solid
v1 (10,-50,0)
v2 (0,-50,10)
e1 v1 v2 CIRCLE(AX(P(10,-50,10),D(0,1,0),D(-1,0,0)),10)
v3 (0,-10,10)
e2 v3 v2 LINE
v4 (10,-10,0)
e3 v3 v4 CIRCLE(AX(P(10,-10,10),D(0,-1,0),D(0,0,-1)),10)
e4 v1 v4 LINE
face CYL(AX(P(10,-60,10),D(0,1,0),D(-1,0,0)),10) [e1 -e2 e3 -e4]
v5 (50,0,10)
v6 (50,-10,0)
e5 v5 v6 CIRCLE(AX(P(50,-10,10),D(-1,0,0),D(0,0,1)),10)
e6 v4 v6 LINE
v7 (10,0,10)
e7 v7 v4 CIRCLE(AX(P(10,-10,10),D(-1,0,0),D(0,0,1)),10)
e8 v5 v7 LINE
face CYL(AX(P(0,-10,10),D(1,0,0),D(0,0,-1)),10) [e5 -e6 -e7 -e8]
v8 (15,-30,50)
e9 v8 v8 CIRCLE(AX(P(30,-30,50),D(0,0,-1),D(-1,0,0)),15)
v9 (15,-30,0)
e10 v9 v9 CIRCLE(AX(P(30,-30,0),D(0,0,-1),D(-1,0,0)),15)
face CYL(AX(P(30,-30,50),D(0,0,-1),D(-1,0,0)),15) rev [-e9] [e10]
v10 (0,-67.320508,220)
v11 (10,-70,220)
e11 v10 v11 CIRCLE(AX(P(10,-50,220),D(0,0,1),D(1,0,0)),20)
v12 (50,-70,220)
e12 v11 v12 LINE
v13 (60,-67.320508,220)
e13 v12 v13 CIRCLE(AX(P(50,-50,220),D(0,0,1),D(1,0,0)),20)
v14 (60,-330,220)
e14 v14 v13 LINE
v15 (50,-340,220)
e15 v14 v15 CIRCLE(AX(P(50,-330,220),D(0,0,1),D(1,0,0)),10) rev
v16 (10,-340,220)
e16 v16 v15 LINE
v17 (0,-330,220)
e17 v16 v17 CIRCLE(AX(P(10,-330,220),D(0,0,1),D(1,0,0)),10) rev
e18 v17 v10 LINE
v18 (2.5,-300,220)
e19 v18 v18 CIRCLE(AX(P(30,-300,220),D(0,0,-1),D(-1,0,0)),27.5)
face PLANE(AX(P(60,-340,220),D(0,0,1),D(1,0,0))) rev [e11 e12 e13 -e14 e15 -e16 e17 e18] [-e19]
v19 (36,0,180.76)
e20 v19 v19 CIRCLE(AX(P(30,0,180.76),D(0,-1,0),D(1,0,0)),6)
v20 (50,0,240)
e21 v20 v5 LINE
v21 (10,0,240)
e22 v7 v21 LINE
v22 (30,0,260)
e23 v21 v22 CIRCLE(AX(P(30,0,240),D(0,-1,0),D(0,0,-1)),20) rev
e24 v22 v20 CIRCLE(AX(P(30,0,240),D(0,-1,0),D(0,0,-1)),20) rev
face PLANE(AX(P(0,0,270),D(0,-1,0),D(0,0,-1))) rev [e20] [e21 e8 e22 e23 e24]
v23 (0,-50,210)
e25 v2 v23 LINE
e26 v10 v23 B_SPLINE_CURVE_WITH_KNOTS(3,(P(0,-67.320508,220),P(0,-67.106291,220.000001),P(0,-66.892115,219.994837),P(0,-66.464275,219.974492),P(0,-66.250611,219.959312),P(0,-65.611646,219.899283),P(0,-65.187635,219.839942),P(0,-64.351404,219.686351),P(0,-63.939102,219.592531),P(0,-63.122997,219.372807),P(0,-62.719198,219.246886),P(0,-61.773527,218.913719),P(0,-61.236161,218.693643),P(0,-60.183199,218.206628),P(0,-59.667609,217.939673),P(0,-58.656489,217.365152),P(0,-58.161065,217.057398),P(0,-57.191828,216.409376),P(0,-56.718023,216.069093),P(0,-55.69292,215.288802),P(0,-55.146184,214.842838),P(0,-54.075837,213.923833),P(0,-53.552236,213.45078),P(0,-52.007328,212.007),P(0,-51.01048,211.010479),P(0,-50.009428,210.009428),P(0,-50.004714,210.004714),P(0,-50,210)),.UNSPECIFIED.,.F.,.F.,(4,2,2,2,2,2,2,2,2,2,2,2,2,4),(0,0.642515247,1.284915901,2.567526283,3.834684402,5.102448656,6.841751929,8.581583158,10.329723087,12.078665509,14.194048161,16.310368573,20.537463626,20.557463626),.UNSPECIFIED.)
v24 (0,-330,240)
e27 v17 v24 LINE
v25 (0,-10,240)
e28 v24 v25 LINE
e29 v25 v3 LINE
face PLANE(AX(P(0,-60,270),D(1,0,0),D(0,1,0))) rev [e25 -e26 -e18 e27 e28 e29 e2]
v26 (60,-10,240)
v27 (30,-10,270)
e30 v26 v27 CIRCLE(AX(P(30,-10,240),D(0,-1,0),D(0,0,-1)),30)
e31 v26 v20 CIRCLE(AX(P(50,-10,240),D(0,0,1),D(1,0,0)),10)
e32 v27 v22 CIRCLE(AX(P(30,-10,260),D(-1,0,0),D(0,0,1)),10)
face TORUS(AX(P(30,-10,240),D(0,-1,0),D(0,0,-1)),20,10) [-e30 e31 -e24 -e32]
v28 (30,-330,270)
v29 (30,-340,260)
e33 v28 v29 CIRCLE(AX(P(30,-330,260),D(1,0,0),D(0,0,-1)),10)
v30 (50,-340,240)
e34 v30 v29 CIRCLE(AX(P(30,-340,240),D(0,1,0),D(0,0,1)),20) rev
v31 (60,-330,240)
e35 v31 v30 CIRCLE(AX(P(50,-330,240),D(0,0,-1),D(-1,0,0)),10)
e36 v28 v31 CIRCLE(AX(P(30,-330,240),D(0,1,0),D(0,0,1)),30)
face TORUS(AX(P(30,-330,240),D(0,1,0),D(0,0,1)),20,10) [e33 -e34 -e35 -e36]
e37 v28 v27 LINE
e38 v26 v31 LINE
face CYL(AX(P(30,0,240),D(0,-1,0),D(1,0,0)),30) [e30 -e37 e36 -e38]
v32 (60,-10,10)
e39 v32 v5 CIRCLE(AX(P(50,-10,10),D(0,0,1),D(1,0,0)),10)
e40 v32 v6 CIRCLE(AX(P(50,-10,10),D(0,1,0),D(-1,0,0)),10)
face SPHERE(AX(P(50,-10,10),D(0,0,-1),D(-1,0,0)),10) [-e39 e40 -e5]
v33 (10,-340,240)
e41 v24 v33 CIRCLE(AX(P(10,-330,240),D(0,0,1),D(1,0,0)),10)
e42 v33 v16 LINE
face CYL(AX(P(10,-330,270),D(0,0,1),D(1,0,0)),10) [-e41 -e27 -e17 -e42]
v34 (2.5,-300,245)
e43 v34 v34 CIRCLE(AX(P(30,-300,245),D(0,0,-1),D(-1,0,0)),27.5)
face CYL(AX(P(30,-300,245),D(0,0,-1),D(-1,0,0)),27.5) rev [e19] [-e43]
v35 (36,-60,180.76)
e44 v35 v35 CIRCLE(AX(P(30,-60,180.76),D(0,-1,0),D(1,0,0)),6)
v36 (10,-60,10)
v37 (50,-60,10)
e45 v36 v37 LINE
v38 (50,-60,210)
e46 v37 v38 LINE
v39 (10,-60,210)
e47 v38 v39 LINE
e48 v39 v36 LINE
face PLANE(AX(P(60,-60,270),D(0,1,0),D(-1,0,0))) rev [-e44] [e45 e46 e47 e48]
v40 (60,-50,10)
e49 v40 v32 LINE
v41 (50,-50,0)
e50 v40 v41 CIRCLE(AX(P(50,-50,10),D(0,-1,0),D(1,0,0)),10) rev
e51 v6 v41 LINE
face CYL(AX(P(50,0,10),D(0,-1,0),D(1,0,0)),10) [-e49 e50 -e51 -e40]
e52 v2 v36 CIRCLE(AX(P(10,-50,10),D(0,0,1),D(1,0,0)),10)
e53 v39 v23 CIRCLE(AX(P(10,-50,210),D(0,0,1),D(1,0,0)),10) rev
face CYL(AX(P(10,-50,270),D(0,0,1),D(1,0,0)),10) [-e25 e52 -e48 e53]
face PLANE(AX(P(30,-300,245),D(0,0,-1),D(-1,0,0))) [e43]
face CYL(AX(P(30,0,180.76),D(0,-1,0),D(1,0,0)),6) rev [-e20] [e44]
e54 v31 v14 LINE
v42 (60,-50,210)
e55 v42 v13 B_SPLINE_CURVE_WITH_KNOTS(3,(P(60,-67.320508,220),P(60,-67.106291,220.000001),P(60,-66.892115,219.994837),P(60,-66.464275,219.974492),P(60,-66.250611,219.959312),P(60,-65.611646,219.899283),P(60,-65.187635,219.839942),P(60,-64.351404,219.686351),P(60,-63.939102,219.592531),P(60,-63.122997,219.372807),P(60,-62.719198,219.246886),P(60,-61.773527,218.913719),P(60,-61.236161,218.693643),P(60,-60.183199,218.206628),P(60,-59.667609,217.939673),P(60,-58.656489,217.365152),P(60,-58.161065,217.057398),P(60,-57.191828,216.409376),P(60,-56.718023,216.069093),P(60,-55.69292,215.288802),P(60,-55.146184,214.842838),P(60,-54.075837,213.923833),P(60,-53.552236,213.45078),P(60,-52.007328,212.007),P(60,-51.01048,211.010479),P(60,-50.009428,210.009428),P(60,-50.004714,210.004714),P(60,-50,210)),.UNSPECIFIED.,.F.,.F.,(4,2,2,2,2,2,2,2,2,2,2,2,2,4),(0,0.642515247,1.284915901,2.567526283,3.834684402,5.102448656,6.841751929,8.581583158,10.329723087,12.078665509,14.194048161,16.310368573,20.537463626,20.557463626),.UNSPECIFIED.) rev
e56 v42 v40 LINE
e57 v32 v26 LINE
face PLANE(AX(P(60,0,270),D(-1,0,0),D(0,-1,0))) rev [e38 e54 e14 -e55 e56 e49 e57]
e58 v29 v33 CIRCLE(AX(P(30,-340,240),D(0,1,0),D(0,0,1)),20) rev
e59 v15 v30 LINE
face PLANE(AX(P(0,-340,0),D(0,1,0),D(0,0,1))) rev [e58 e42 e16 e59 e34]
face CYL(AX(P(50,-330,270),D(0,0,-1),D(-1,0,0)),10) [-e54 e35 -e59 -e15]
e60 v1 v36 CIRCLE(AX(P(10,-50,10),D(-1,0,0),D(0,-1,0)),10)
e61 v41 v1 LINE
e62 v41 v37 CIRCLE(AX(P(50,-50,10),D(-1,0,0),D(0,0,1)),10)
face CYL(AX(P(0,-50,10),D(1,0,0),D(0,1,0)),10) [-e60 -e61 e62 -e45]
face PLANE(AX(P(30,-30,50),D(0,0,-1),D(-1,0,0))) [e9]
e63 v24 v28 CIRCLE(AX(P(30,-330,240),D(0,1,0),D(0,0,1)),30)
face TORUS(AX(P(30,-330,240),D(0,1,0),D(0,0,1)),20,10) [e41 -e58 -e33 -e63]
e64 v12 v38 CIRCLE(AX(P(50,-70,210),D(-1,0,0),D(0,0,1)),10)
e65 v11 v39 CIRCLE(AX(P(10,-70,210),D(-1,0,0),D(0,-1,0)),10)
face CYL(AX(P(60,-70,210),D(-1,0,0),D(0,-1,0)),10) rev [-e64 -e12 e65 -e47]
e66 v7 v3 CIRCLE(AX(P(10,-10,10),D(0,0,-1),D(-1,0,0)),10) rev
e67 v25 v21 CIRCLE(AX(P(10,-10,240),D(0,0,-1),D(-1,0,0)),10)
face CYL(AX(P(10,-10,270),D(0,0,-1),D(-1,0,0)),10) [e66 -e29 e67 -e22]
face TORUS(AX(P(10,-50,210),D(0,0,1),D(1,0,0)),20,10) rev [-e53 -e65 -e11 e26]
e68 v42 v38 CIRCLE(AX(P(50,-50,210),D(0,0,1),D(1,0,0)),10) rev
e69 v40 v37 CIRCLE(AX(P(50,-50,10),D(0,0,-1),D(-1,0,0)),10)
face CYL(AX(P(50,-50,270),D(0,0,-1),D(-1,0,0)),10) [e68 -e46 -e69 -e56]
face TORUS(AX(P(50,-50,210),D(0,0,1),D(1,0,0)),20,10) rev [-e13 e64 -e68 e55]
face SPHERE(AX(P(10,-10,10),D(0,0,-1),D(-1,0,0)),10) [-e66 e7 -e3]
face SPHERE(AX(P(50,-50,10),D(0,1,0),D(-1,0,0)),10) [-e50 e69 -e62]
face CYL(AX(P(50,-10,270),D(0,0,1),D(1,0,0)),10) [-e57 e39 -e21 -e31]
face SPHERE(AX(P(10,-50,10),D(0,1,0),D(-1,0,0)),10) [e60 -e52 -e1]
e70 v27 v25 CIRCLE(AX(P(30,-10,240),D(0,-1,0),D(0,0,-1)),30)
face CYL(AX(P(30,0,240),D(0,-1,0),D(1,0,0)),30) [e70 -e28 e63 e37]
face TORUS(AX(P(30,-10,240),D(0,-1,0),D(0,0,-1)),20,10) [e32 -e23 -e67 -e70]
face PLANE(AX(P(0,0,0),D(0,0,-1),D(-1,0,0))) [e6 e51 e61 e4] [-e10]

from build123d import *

# Parameters (mm, degrees)
SKETCH1_W           = 60
SKETCH1_H           = 60
BOSS_EXTRUDE1_DEPTH = 270
SKETCH2_W           = 60
SKETCH2_H           = 50
BOSS_EXTRUDE2_DEPTH = 280
SKETCH3_R           = 15
CUT_EXTRUDE1_DEPTH  = 50
SKETCH4_R           = 27.5
CUT_EXTRUDE2_DEPTH  = 25
FILLET1_R           = 30
FILLET2_R           = 30
FILLET3_R           = 10
FILLET4_R           = 10
FILLET5_R           = 10
FILLET6_R           = 10
FILLET7_R           = 10
SKETCH5_R           = 6
CUT_EXTRUDE4_DEPTH  = 394.573373167


# Some blends are built 0.0001 mm under size
with BuildPart() as part:
    # Sketch1 → Boss-Extrude1 (new body)
    with BuildSketch(Plane.XY):
        with Locations((30, -30)):
            Rectangle(SKETCH1_W, SKETCH1_H)
    extrude(amount=BOSS_EXTRUDE1_DEPTH)

    # Sketch2 → Boss-Extrude2 (add)
    with BuildSketch(Plane.XZ.offset(60)):
        with Locations((30, 245)):
            Rectangle(SKETCH2_W, SKETCH2_H)
    extrude(amount=BOSS_EXTRUDE2_DEPTH)

    # Sketch3 → Cut-Extrude1 (cut)
    with BuildSketch(Plane(origin=(0, 0, 0), x_dir=(-1, 0, 0), z_dir=(0, 0, -1))):
        with Locations((-30, -30)):
            Circle(SKETCH3_R)
    extrude(amount=-CUT_EXTRUDE1_DEPTH, mode=Mode.SUBTRACT)

    # Sketch4 → Cut-Extrude2 (cut)
    with BuildSketch(Plane(origin=(0, 0, 220), x_dir=(-1, 0, 0), z_dir=(0, 0, -1))):
        with Locations((-30, -300)):
            Circle(SKETCH4_R)
    extrude(amount=-CUT_EXTRUDE2_DEPTH, mode=Mode.SUBTRACT)

    # Fillet1
    fillet1_edges = [part.edges().sort_by_distance(p)[0] for p in [
        (60, -170, 270),
    ]]
    fillet(fillet1_edges, radius=FILLET1_R)

    # Fillet2
    fillet2_edges = [part.edges().sort_by_distance(p)[0] for p in [
        (0, -170, 270),
    ]]
    fillet(fillet2_edges, radius=FILLET2_R - 0.0001)  # a hair under: the kernel refuses the full size

    # Fillet3
    fillet3_edges = [part.edges().sort_by_distance(p)[0] for p in [
        (60, 0, 120),
        (51.213203436, 0, 261.213203436),
        (0, 0, 120.00005),
        (8.786767275, 0, 261.213232725),
    ]]
    fillet(fillet3_edges, radius=FILLET3_R)

    # Fillet4
    fillet4_edges = [part.edges().sort_by_distance(p)[0] for p in [
        (60, -35, 0),
        (30, 0, 0),
        (0, -35, 0),
        (2.928932188, -2.928932188, 0),
        (57.071067812, -2.928932188, 0),
    ]]
    fillet(fillet4_edges, radius=FILLET4_R)

    # Fillet5
    fillet5_edges = [part.edges().sort_by_distance(p)[0] for p in [
        (60, -60, 115),
        (0, -60, 115),
        (30, -60, 0),
        (2.928932188, -60, 2.928932188),
        (57.071067812, -60, 2.928932188),
    ]]
    fillet(fillet5_edges, radius=FILLET5_R)

    # Fillet6
    # the kernel refuses this fillet: 10 mm, written as the material it adds along each edge
    with BuildSketch(Plane(origin=(50, -60, 220), x_dir=(0, 0, -1), z_dir=(-1, 0, 0))) as fillet6_piece_1:
        with BuildLine():
            CenterArc((FILLET6_R, FILLET6_R), FILLET6_R, 180, 90)
            Line((0, FILLET6_R), (0, 0))
            Line((0, 0), (FILLET6_R, 0))
        make_face()
    extrude(amount=40)
    with BuildSketch(Plane(origin=(50, -50, 220), x_dir=(-0.8017442392976486, 0.5976672776328272, 0), z_dir=(-0.5976672776328272, -0.8017442392976486, 0))) as fillet6_piece_2_section:
        with BuildLine():
            CenterArc((10 + FILLET6_R, FILLET6_R), FILLET6_R, 180, 90)
            Line((10 + FILLET6_R, 0), (10, 0))
            Line((10, 0), (10, FILLET6_R))
        make_face()
    fillet6_piece_2 = revolve(axis=Axis((50, -50, 220), (0, 0, -1)), revolution_arc=233.296989237, mode=Mode.PRIVATE)
    fillet6_piece_2 = split(fillet6_piece_2, bisect_by=Plane(origin=(60, -57.499389328, 216.883716878), z_dir=(-1, 0, 0)), keep=Keep.TOP, mode=Mode.PRIVATE)
    add(fillet6_piece_2)
    with BuildSketch(Plane(origin=(10, -50, 220), x_dir=(0.8017442392976489, 0.5976672776328267, 0), z_dir=(0.5976672776328267, -0.8017442392976489, 0))) as fillet6_piece_3_section:
        with BuildLine():
            CenterArc((10 + FILLET6_R, -FILLET6_R), FILLET6_R, 90, 90)
            Line((10, -FILLET6_R), (10, 0))
            Line((10, 0), (10 + FILLET6_R, 0))
        make_face()
    fillet6_piece_3 = revolve(axis=Axis((10, -50, 220), (0, 0, 1)), revolution_arc=233.296989237, mode=Mode.PRIVATE)
    fillet6_piece_3 = split(fillet6_piece_3, bisect_by=Plane(origin=(0, -57.499389357, 216.883716675), z_dir=(1, 0, 0)), keep=Keep.TOP, mode=Mode.PRIVATE)
    add(fillet6_piece_3)

    # Fillet7
    fillet7_edges = [part.edges().sort_by_distance(p)[0] for p in [
        (60, -340, 230),
        (51.213203436, -340, 261.213203436),
        (0, -340, 230.00005),
        (8.786767275, -340, 261.213232725),
    ]]
    fillet(fillet7_edges, radius=FILLET7_R)

    # Sketch5 → Cut-Extrude4 (cut, through all)
    with BuildSketch(Plane.XZ.offset(60)):
        with Locations((30, 180.76)):
            Circle(SKETCH5_R)
    extrude(amount=-CUT_EXTRUDE4_DEPTH, mode=Mode.SUBTRACT)


solid = part.part
